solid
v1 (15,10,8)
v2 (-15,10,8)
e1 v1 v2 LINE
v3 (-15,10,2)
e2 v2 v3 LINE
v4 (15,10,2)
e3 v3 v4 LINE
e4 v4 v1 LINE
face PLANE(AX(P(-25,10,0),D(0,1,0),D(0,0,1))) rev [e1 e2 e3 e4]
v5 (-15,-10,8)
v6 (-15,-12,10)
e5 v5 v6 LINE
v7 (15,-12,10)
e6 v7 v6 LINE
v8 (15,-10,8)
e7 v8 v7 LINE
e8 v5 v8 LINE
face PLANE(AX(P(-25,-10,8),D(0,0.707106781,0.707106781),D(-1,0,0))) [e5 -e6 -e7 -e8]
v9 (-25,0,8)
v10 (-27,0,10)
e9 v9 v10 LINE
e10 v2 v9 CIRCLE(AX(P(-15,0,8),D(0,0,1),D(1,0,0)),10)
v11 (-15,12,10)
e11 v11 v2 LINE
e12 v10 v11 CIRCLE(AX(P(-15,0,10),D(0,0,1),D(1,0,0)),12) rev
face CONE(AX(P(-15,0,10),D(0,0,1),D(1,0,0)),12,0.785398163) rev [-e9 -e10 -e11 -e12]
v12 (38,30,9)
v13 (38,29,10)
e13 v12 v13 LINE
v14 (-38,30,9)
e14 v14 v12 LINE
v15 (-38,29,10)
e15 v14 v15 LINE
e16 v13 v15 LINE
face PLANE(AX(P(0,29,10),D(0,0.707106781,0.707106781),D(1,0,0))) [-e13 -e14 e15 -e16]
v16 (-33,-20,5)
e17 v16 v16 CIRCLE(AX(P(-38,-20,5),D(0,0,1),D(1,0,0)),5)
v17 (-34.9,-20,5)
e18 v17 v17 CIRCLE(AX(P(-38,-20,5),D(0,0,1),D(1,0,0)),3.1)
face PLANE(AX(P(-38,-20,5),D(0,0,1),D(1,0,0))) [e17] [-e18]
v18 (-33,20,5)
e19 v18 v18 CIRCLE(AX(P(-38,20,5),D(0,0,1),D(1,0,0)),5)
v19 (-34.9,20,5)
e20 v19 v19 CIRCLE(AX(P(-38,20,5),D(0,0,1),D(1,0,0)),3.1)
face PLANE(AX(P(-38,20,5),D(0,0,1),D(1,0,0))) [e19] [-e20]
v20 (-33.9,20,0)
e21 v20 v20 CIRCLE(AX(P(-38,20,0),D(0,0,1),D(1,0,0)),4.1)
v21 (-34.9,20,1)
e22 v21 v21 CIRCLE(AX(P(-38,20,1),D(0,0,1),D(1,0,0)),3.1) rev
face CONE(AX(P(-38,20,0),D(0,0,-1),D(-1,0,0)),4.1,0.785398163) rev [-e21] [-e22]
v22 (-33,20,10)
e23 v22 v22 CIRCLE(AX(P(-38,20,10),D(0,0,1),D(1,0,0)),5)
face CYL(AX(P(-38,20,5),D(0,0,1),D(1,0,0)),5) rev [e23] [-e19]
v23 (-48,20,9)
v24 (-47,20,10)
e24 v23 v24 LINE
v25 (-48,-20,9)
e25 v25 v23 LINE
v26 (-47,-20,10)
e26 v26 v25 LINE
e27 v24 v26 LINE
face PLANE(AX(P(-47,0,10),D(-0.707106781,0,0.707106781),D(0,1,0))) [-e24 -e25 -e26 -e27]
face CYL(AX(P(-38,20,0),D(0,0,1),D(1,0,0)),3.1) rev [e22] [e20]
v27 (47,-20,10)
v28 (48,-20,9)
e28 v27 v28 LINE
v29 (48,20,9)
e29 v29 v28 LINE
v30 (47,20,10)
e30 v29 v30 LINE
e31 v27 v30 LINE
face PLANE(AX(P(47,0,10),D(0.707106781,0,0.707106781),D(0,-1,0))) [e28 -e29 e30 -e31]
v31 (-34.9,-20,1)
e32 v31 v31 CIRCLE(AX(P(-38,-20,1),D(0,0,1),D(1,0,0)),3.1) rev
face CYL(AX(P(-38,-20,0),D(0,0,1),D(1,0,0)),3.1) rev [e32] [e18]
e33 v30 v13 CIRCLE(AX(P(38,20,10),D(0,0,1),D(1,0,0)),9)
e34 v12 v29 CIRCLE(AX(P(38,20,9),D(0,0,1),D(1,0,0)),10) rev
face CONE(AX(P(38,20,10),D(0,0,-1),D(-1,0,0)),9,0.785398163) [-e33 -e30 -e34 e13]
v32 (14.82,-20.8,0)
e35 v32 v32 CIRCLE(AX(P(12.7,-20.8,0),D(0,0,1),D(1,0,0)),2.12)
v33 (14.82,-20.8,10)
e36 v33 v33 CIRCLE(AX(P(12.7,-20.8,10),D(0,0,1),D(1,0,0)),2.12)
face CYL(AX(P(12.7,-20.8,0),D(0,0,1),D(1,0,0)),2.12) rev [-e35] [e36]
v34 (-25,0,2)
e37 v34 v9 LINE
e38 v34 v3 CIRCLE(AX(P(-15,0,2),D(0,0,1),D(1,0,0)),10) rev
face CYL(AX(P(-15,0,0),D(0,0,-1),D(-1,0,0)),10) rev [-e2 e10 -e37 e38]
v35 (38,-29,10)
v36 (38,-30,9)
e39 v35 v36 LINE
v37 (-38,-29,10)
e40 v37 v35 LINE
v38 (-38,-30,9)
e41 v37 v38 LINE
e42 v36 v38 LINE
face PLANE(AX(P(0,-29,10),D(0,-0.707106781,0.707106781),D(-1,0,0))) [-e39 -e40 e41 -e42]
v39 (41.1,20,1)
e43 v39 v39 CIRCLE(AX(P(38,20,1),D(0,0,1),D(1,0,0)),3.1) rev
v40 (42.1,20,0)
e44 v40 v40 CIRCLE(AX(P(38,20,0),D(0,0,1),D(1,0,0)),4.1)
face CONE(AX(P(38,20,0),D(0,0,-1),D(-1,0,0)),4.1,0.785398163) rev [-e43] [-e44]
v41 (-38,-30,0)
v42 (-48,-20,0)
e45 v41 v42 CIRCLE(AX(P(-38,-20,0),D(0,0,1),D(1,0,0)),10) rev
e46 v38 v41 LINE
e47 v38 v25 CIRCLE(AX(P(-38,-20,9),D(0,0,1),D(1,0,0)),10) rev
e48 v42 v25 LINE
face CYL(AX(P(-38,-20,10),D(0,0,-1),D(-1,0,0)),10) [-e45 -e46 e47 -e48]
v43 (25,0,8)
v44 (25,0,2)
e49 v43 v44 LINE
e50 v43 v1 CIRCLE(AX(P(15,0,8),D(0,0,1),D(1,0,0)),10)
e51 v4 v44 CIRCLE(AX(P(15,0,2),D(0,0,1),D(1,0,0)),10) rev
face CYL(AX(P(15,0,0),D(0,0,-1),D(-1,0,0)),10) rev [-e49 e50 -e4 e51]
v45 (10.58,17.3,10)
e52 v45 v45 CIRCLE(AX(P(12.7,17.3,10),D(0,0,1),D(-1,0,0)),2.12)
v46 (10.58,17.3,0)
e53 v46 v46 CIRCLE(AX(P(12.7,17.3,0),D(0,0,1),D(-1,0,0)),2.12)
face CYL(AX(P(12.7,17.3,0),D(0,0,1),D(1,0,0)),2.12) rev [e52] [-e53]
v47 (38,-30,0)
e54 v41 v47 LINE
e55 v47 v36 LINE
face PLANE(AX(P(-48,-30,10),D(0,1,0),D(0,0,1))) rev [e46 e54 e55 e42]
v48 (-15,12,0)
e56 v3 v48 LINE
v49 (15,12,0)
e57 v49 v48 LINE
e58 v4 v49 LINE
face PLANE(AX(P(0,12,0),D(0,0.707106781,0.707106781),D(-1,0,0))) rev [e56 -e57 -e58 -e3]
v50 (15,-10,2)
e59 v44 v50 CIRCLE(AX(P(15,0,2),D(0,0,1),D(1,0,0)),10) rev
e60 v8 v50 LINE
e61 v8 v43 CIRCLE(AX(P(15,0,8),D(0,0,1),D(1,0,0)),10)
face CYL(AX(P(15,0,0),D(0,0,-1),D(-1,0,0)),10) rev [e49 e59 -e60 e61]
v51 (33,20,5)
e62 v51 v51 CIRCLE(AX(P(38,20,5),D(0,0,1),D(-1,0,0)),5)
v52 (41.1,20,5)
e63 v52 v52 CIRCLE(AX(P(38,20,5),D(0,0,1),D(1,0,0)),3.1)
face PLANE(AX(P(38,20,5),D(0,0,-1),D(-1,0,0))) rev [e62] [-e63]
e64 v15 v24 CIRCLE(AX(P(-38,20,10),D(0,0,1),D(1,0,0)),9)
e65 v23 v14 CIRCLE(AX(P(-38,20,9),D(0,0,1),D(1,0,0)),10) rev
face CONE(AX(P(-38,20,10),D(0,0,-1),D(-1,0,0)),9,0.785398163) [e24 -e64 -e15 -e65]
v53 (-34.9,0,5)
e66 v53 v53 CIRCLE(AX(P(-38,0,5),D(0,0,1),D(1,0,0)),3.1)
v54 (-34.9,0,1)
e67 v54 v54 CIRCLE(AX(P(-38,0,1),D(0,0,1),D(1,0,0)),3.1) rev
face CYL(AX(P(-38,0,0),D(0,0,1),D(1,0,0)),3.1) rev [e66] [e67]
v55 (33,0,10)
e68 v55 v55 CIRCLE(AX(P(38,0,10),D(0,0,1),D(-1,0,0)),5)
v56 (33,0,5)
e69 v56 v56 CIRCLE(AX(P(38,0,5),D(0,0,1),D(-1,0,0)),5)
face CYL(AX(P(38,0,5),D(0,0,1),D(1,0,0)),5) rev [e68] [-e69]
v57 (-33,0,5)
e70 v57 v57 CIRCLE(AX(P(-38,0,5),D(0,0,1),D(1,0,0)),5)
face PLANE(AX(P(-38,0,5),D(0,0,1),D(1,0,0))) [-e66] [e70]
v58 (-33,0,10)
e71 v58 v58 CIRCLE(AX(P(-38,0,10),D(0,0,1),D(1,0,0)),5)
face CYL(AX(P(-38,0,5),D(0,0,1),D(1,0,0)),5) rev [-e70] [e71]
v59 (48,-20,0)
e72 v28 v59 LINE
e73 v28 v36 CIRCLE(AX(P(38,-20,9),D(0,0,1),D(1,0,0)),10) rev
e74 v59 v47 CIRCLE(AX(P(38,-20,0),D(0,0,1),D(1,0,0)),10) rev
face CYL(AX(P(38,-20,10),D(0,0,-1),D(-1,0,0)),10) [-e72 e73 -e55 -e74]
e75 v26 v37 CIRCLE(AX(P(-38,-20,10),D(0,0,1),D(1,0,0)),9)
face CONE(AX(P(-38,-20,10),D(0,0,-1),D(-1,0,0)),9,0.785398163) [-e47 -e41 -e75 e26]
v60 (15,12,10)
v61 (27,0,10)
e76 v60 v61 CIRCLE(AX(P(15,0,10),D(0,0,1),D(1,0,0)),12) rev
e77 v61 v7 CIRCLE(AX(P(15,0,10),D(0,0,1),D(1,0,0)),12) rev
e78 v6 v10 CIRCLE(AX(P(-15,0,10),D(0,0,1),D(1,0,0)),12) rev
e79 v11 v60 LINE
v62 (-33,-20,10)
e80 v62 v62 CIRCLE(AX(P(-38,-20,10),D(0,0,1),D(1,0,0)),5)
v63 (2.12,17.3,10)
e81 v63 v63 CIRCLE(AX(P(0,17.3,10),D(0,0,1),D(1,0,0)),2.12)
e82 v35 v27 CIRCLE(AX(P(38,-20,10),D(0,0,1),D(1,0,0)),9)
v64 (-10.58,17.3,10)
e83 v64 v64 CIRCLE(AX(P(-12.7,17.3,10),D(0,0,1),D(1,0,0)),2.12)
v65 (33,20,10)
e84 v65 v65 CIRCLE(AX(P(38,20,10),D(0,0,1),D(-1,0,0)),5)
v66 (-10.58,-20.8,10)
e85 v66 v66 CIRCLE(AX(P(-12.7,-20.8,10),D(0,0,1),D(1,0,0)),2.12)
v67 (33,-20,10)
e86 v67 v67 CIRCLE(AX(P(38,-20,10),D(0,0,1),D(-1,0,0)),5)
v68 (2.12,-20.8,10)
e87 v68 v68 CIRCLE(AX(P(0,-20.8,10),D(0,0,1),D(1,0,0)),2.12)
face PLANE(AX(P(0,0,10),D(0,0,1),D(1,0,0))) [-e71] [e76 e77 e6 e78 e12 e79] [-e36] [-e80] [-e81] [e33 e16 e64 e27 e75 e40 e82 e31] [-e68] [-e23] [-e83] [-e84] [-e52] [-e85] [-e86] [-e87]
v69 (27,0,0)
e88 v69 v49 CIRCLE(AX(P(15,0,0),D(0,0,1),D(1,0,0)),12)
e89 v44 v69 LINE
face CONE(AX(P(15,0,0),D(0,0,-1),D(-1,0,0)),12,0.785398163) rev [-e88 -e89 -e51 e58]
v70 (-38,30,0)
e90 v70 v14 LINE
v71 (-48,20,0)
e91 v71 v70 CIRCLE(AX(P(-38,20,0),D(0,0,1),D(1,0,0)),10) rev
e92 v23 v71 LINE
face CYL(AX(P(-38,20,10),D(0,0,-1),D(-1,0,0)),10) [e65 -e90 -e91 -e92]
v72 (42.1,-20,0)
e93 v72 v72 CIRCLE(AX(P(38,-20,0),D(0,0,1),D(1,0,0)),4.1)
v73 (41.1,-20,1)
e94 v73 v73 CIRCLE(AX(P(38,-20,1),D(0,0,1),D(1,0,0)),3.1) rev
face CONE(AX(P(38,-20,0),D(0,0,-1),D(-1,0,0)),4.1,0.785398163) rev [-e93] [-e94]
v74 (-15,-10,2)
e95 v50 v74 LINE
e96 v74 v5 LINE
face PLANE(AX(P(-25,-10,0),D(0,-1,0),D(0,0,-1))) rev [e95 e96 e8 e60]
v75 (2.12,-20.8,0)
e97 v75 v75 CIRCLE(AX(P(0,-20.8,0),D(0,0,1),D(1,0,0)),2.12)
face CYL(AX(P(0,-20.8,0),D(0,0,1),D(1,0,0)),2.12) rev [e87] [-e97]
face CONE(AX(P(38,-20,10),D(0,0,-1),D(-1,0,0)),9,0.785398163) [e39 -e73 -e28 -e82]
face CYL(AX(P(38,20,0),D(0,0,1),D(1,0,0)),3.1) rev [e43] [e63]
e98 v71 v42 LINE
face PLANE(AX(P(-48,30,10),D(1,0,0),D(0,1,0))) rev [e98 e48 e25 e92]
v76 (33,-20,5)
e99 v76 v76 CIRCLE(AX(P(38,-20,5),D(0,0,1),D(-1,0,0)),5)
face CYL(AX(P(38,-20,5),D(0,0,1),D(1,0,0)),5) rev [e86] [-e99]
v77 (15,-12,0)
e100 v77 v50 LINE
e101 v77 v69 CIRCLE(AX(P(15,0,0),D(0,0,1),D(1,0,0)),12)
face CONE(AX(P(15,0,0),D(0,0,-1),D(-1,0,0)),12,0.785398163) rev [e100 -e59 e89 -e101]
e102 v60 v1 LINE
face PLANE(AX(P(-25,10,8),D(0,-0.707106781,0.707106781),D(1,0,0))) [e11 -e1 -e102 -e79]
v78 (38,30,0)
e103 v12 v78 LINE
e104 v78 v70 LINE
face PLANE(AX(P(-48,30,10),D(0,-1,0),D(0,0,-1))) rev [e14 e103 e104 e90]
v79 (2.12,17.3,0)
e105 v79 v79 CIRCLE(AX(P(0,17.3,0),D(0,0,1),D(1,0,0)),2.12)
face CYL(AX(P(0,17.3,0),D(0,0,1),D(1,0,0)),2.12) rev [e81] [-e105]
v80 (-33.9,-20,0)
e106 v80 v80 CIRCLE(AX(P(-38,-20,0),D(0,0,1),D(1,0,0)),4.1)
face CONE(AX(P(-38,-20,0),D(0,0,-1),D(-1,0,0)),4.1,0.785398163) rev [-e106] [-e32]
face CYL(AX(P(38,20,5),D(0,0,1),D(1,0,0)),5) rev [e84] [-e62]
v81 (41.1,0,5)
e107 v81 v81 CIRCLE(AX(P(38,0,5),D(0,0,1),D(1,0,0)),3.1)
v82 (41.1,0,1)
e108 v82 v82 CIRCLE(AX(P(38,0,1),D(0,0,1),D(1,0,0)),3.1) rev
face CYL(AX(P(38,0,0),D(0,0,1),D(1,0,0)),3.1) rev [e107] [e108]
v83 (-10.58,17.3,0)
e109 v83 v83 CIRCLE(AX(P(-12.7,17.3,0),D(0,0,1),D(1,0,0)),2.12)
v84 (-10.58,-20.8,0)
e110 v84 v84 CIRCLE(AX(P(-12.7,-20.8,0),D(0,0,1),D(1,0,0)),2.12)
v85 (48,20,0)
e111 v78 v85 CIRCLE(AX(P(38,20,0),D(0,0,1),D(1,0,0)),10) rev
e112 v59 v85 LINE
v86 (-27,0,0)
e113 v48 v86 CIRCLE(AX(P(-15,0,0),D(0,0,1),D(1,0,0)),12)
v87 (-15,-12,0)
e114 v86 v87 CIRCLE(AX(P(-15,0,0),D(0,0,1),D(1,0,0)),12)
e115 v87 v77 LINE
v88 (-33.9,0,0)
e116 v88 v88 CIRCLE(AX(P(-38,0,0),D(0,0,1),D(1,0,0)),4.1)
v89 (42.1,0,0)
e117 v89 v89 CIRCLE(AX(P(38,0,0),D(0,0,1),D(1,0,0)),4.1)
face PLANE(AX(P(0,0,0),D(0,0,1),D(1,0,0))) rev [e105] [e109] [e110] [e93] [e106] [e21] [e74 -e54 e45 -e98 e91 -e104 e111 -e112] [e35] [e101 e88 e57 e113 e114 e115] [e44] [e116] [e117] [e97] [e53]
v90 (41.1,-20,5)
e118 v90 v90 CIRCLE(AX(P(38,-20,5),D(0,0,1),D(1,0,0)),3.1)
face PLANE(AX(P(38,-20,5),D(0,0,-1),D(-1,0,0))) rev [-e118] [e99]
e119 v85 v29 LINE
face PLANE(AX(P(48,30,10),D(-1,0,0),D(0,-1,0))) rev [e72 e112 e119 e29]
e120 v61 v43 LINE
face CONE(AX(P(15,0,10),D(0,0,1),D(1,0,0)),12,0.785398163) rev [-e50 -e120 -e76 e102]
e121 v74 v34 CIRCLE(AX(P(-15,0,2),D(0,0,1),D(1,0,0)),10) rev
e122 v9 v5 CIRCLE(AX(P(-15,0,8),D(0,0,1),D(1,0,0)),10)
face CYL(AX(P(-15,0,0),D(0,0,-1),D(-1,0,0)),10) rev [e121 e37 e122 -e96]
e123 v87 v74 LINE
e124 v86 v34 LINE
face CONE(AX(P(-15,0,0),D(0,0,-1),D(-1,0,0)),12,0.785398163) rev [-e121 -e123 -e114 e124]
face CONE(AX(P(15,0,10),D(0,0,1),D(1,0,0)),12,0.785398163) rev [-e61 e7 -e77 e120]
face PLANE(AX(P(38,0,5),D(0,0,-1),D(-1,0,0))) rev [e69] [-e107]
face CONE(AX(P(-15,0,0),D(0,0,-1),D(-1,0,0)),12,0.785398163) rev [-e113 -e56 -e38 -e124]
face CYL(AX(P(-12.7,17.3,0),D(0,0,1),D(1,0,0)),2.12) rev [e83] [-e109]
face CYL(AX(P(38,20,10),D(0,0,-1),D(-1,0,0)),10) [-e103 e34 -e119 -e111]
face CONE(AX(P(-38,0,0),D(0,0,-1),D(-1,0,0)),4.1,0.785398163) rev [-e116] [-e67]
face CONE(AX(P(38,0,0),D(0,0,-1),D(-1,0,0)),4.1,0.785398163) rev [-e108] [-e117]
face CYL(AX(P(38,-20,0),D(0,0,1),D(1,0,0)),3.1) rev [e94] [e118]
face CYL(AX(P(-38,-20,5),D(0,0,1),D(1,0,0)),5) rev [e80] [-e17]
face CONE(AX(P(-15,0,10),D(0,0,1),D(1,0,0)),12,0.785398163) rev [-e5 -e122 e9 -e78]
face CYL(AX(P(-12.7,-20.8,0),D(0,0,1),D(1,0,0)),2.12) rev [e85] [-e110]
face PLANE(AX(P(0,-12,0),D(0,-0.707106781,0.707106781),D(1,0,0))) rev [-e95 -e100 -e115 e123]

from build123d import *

# Parameters (mm, degrees)
SKETCH_1_W          = 96
SKETCH_1_H          = 60
EXTRUDE_1_DEPTH     = 10
FILLET_1_R          = 10
SKETCH_2_R          = 2.12
CUT_EXTRUDE_1_DEPTH = 10
SKETCH_3_R          = 5
CUT_EXTRUDE_2_DEPTH = 5
SKETCH_4_R          = 3.1
CUT_EXTRUDE_3_DEPTH = 5
CHAMFER_1_SIZE      = 1
CHAMFER_2_SIZE      = 1
SKETCH_5_W          = 50
SKETCH_5_H          = 20
CUT_EXTRUDE_4_DEPTH = 10
FILLET_2_R          = 10
CHAMFER_3_SIZE      = 2


with BuildPart() as part:
    # 草图1 → 凸台-拉伸1 (new body)
    with BuildSketch(Plane.XY):
        Rectangle(SKETCH_1_W, SKETCH_1_H)
    extrude(amount=EXTRUDE_1_DEPTH)

    # 圆角1
    fillet_1_edges = [part.edges().sort_by_distance(p)[0] for p in [
        (48, -30, 5),
        (-48, -30, 5),
        (-48, 30, 5),
        (48, 30, 5),
    ]]
    fillet(fillet_1_edges, radius=FILLET_1_R)

    # 草图2 → 切除-拉伸1 (cut)
    with BuildSketch(Plane.XY.offset(10)):
        with Locations((0, 17.3)):
            Circle(SKETCH_2_R)
        with Locations((-12.7, 17.3)):
            Circle(SKETCH_2_R)
        with Locations(Location((12.7, 17.3, 0), (0, 0, 180))):
            Circle(SKETCH_2_R)
        with Locations((-12.7, -20.8)):
            Circle(SKETCH_2_R)
        with Locations((0, -20.8)):
            Circle(SKETCH_2_R)
        with Locations((12.7, -20.8)):
            Circle(SKETCH_2_R)
    extrude(amount=-CUT_EXTRUDE_1_DEPTH, mode=Mode.SUBTRACT)

    # 草图3 → 切除-拉伸2 (cut)
    with BuildSketch(Plane.XY.offset(10)):
        with Locations((-38, 20)):
            Circle(SKETCH_3_R)
        with Locations((-38, 0)):
            Circle(SKETCH_3_R)
        with Locations((-38, -20)):
            Circle(SKETCH_3_R)
        with Locations(Location((38, -20, 0), (0, 0, 180))):
            Circle(SKETCH_3_R)
        with Locations(Location((38, 0, 0), (0, 0, 180))):
            Circle(SKETCH_3_R)
        with Locations(Location((38, 20, 0), (0, 0, 180))):
            Circle(SKETCH_3_R)
    extrude(amount=-CUT_EXTRUDE_2_DEPTH, mode=Mode.SUBTRACT)

    # 草图4 → 切除-拉伸3 (cut)
    with BuildSketch(Plane.XY.offset(5)):
        with Locations((-38, 20)):
            Circle(SKETCH_4_R)
        with Locations((-38, 0)):
            Circle(SKETCH_4_R)
        with Locations((-38, -20)):
            Circle(SKETCH_4_R)
        with Locations((38, 20)):
            Circle(SKETCH_4_R)
        with Locations((38, 0)):
            Circle(SKETCH_4_R)
        with Locations((38, -20)):
            Circle(SKETCH_4_R)
    extrude(amount=-CUT_EXTRUDE_3_DEPTH, mode=Mode.SUBTRACT)

    # 倒角1
    chamfer_1_edges = [part.edges().sort_by_distance(p)[0] for p in [
        (-41.1, 0, 0),
        (-41.1, -20, 0),
        (34.9, 20, 0),
        (34.9, 0, 0),
        (34.9, -20, 0),
        (-41.1, 20, 0),
    ]]
    chamfer(chamfer_1_edges, length=CHAMFER_1_SIZE)

    # 倒角2
    chamfer_2_edges = [part.edges().sort_by_distance(p)[0] for p in [
        (0, 30, 10),
        (48, 0, 10),
        (-48, 0, 10),
        (0, -30, 10),
        (-45.071067812, -27.071067812, 10),
        (45.071067812, -27.071067812, 10),
        (-45.071067812, 27.071067812, 10),
        (45.071067812, 27.071067812, 10),
    ]]
    chamfer(chamfer_2_edges, length=CHAMFER_2_SIZE)

    # 草图5 → 切除-拉伸4 (cut)
    with BuildSketch(Plane.XY.offset(10)):
        Rectangle(SKETCH_5_W, SKETCH_5_H)
    extrude(amount=-CUT_EXTRUDE_4_DEPTH, mode=Mode.SUBTRACT)

    # 圆角2
    fillet_2_edges = [part.edges().sort_by_distance(p)[0] for p in [
        (25, -10, 5),
        (25, 10, 5),
        (-25, -10, 5),
        (-25, 10, 5),
    ]]
    fillet(fillet_2_edges, radius=FILLET_2_R - 0.0001)  # a hair under: the kernel refuses the full size

    # 倒角3
    chamfer_3_edges = [part.edges().sort_by_distance(p)[0] for p in [
        (0, -10, 10),
        (0, -10, 0),
        (0, 10, 10),
        (0, 10, 0),
        (22.071097101, -7.071097101, 10),
        (22.071097101, -7.071097101, 0),
        (22.071097101, 7.071097101, 10),
        (22.071097101, 7.071097101, 0),
        (-22.071097101, -7.071097101, 10),
        (-22.071097101, -7.071097101, 0),
        (-22.071097101, 7.071097101, 10),
        (-22.071097101, 7.071097101, 0),
    ]]
    chamfer(chamfer_3_edges, length=CHAMFER_3_SIZE)


solid = part.part
